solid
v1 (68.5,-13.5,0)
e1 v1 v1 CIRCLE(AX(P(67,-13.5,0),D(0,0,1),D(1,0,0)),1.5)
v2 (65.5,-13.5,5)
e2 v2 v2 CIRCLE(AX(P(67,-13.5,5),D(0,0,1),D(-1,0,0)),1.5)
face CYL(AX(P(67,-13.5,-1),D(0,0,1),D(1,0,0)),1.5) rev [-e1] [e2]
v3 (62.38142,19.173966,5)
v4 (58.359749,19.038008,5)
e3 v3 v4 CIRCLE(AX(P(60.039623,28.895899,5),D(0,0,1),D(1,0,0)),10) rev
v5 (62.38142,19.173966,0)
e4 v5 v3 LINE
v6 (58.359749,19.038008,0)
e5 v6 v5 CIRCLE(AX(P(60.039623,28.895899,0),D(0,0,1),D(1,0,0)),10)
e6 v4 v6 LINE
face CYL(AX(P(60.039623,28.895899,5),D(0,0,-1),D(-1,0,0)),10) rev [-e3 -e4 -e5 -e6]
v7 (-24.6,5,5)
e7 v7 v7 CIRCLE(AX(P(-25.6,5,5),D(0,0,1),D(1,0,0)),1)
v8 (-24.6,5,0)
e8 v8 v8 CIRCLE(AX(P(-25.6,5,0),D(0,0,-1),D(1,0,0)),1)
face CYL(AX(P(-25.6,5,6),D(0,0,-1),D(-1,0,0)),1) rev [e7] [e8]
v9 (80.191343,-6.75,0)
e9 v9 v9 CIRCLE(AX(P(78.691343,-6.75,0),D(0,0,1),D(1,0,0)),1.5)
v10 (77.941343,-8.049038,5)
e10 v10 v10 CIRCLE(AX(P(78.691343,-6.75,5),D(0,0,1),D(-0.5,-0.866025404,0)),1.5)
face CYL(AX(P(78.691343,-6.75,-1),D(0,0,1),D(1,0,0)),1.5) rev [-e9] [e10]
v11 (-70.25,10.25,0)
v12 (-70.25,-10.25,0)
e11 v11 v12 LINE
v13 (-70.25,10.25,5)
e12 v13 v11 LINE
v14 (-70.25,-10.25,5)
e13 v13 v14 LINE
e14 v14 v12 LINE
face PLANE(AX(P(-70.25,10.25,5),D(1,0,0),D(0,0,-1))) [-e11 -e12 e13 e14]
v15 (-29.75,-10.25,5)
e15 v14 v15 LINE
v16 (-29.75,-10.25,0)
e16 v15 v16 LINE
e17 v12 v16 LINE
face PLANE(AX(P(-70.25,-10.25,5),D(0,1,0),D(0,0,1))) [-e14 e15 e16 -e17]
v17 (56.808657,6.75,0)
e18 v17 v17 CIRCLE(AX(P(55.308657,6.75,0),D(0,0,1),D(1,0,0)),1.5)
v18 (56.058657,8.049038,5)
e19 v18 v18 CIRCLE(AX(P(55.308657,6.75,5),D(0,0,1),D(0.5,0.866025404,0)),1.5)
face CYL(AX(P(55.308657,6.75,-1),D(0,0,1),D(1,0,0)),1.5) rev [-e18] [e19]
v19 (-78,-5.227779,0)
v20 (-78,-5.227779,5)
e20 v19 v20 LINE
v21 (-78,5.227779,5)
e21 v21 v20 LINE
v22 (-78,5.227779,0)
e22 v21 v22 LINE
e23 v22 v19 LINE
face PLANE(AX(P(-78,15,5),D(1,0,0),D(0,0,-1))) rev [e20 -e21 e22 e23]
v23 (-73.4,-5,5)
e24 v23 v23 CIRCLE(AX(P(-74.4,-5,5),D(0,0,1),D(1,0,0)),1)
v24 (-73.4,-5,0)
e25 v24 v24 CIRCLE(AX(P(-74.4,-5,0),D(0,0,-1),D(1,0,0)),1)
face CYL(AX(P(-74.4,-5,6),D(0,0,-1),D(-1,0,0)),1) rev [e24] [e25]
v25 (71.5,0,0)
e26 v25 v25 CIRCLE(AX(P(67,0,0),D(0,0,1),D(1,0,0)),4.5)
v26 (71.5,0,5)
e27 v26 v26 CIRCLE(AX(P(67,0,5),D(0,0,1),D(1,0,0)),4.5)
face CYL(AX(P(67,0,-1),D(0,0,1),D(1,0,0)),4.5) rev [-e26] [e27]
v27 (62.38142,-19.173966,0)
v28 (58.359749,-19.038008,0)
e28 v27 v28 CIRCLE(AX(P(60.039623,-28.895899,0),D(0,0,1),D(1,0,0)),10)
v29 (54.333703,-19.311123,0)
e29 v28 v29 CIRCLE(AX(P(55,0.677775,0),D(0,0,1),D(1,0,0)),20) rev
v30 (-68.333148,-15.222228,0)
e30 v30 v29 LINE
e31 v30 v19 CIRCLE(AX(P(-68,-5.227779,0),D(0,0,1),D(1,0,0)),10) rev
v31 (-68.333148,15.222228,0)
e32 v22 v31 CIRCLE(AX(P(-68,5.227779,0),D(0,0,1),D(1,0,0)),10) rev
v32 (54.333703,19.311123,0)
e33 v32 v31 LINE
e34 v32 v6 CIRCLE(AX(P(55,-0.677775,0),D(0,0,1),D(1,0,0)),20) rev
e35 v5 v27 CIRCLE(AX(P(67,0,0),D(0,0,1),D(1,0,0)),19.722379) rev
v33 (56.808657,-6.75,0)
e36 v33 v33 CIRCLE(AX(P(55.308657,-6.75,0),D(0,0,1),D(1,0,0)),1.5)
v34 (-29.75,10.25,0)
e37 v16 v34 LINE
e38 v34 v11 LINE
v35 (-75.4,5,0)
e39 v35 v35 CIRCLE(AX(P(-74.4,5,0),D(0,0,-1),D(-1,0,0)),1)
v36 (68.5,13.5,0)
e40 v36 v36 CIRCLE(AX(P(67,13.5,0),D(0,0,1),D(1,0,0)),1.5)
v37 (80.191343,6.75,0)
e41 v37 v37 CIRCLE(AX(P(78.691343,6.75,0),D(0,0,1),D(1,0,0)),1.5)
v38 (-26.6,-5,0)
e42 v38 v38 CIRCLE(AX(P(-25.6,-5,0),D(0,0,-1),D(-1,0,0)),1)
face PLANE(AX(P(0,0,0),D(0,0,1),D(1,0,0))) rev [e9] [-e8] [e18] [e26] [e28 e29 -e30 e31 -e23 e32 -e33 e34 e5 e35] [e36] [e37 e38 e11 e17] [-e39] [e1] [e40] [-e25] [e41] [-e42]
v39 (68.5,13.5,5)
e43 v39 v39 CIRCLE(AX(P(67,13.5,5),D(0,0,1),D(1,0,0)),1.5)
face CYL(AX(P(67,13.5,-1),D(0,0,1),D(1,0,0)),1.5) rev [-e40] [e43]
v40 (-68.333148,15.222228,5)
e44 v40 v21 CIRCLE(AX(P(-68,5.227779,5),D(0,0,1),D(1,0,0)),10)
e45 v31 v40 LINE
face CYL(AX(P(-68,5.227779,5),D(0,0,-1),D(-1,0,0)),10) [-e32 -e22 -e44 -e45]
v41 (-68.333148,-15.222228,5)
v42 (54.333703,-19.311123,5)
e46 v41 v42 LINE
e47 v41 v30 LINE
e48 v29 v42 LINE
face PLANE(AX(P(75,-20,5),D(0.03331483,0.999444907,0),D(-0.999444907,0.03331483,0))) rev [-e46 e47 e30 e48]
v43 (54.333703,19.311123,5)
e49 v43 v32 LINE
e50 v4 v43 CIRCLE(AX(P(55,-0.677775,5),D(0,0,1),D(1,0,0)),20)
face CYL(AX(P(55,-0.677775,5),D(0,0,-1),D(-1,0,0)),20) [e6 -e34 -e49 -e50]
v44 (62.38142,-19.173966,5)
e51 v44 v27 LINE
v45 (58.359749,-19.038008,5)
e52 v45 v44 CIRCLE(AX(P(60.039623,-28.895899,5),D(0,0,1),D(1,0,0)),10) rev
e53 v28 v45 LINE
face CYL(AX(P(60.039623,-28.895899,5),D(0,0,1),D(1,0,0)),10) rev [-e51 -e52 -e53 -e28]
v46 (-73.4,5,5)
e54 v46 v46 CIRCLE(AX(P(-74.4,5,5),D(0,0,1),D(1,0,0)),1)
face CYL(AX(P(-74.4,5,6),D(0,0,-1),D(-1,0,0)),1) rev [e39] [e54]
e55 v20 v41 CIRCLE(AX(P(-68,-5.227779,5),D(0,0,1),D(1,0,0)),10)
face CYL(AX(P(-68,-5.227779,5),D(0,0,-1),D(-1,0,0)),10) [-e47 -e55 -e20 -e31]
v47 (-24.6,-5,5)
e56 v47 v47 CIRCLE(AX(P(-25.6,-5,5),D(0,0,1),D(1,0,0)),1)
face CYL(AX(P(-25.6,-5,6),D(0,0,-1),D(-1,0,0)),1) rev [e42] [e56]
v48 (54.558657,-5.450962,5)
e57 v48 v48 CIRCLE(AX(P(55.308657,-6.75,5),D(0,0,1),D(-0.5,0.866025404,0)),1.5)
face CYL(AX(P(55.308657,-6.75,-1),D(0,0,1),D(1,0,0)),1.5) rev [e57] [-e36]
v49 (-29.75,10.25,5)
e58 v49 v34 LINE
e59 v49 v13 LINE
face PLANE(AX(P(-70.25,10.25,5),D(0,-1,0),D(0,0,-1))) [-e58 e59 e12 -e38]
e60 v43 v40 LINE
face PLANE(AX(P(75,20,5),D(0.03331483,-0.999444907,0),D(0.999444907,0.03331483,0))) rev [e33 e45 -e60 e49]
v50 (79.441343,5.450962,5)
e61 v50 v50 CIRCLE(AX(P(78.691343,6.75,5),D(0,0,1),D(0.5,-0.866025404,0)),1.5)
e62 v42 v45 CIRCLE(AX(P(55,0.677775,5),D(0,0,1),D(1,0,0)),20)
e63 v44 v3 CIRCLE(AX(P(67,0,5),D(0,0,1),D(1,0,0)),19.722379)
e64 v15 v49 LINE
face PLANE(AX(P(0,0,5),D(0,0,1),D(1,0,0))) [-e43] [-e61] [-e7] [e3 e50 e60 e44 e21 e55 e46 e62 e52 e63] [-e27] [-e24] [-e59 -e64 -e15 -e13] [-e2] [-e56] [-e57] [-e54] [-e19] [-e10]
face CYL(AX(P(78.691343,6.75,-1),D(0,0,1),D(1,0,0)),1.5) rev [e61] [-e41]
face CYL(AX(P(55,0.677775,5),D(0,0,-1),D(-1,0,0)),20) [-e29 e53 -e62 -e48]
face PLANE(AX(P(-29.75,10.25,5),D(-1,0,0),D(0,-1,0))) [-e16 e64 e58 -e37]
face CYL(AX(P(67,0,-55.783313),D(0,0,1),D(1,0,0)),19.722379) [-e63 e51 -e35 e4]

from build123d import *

# Parameters (mm, degrees)
SKETCH1_R           = 3
SKETCH1_W           = 40.5
SKETCH1_H           = 20.5
BOSS_EXTRUDE1_DEPTH = 5
FILLET2_R           = 20
BOSS_EXTRUDE2_START = -5
SKETCH3_R           = 19.722379498
SKETCH3_R_2         = 3
BOSS_EXTRUDE2_DEPTH = 5
FILLET3_R           = 10
SKETCH4_R           = 1
CUT_EXTRUDE1_DEPTH  = 6
SKETCH5_R           = 1.5
CUT_EXTRUDE2_DEPTH  = 6
SKETCH6_R           = 4.5
CUT_EXTRUDE3_DEPTH  = 6
CIRPATTERN1_COUNT   = 6


with BuildPart() as part:
    # Sketch1 → Boss-Extrude1 (new body)
    with BuildSketch(Plane.XY):
        Polygon((75, 20), (75, -20), (-75, -15), (-78, -15), (-78, 15), (-75, 15), align=None)
        with Locations((67, 0)):
            Circle(SKETCH1_R, mode=Mode.SUBTRACT)
        with Locations((-50, 0)):
            Rectangle(SKETCH1_W, SKETCH1_H, mode=Mode.SUBTRACT)
    extrude(amount=BOSS_EXTRUDE1_DEPTH)

    # Fillet2
    # the kernel refuses this fillet: 20 mm, written as the material it takes off along each edge
    with BuildSketch(Plane(origin=(75, -20, -51.694436733), x_dir=(0, 1, 0), z_dir=(0, 0, 1))) as fillet2_piece_1:
        with BuildLine():
            CenterArc((FILLET2_R * 1.03388873465, FILLET2_R), FILLET2_R, 178.090847567, 91.909152433)
            Line((FILLET2_R * 0.0344438276744, FILLET2_R * 1.03331483023), (0, 0))
            Line((0, 0), (FILLET2_R * 1.03388873465, 0))
        make_face()
    extrude(amount=108.388873465, mode=Mode.SUBTRACT)
    with BuildSketch(Plane(origin=(75, 20, -51.694436733), x_dir=(0, -1, 0), z_dir=(0, 0, 1))) as fillet2_piece_2:
        with BuildLine():
            CenterArc((FILLET2_R * 1.03388873465, -FILLET2_R), FILLET2_R, 90, 91.909152433)
            Line((FILLET2_R * 0.0344438276744, -FILLET2_R * 1.03331483023), (0, 0))
            Line((0, 0), (FILLET2_R * 1.03388873465, 0))
        make_face()
    extrude(amount=108.388873465, mode=Mode.SUBTRACT)

    # Sketch3 → Boss-Extrude2 (add)
    with BuildSketch(Plane.XY.offset(5).offset(BOSS_EXTRUDE2_START)):
        with Locations((67, 0)):
            Circle(SKETCH3_R)
        with Locations((67, 0)):
            Circle(SKETCH3_R_2, mode=Mode.SUBTRACT)
    extrude(amount=BOSS_EXTRUDE2_DEPTH)

    # Fillet3
    fillet3_edges = [part.edges().sort_by_distance(p)[0] for p in [
        (-78, 15, 2.5),
        (-78, -15, 2.5),
        (60.390814278, -18.582005197, 2.5),
        (60.390814278, 18.582005197, 2.5),
    ]]
    fillet(fillet3_edges, radius=FILLET3_R)

    # Sketch4 → Cut-Extrude1 (cut)
    with BuildSketch(Plane(origin=(0, 0, 0), x_dir=(-1, 0, 0), z_dir=(0, 0, -1))):
        with Locations((25.6, -5)):
            Circle(SKETCH4_R)
        with Locations(Location((25.6, 5, 0), (0, 0, 180))):
            Circle(SKETCH4_R)
        with Locations((74.4, 5)):
            Circle(SKETCH4_R)
        with Locations(Location((74.4, -5, 0), (0, 0, 180))):
            Circle(SKETCH4_R)
    extrude(amount=-CUT_EXTRUDE1_DEPTH, mode=Mode.SUBTRACT)

    # Sketch5 → Cut-Extrude2 (cut)
    with BuildSketch(Plane.XY.offset(5)):
        with Locations((67, 13.5)):
            Circle(SKETCH5_R)
    cut_extrude2 = extrude(amount=-CUT_EXTRUDE2_DEPTH, mode=Mode.SUBTRACT)

    # Sketch6 → Cut-Extrude3 (cut)
    with BuildSketch(Plane.XY.offset(5)):
        with Locations((67, 0)):
            Circle(SKETCH6_R)
    extrude(amount=-CUT_EXTRUDE3_DEPTH, mode=Mode.SUBTRACT)

    # CirPattern1: Cut-Extrude2 ×6 about axis
    cirpattern1_axis = Axis((67, 0, 0), (0, 0, 1))
    for i in range(1, CIRPATTERN1_COUNT):
        add(cut_extrude2.rotate(cirpattern1_axis, i * 360 / CIRPATTERN1_COUNT), mode=Mode.SUBTRACT)


solid = part.part
